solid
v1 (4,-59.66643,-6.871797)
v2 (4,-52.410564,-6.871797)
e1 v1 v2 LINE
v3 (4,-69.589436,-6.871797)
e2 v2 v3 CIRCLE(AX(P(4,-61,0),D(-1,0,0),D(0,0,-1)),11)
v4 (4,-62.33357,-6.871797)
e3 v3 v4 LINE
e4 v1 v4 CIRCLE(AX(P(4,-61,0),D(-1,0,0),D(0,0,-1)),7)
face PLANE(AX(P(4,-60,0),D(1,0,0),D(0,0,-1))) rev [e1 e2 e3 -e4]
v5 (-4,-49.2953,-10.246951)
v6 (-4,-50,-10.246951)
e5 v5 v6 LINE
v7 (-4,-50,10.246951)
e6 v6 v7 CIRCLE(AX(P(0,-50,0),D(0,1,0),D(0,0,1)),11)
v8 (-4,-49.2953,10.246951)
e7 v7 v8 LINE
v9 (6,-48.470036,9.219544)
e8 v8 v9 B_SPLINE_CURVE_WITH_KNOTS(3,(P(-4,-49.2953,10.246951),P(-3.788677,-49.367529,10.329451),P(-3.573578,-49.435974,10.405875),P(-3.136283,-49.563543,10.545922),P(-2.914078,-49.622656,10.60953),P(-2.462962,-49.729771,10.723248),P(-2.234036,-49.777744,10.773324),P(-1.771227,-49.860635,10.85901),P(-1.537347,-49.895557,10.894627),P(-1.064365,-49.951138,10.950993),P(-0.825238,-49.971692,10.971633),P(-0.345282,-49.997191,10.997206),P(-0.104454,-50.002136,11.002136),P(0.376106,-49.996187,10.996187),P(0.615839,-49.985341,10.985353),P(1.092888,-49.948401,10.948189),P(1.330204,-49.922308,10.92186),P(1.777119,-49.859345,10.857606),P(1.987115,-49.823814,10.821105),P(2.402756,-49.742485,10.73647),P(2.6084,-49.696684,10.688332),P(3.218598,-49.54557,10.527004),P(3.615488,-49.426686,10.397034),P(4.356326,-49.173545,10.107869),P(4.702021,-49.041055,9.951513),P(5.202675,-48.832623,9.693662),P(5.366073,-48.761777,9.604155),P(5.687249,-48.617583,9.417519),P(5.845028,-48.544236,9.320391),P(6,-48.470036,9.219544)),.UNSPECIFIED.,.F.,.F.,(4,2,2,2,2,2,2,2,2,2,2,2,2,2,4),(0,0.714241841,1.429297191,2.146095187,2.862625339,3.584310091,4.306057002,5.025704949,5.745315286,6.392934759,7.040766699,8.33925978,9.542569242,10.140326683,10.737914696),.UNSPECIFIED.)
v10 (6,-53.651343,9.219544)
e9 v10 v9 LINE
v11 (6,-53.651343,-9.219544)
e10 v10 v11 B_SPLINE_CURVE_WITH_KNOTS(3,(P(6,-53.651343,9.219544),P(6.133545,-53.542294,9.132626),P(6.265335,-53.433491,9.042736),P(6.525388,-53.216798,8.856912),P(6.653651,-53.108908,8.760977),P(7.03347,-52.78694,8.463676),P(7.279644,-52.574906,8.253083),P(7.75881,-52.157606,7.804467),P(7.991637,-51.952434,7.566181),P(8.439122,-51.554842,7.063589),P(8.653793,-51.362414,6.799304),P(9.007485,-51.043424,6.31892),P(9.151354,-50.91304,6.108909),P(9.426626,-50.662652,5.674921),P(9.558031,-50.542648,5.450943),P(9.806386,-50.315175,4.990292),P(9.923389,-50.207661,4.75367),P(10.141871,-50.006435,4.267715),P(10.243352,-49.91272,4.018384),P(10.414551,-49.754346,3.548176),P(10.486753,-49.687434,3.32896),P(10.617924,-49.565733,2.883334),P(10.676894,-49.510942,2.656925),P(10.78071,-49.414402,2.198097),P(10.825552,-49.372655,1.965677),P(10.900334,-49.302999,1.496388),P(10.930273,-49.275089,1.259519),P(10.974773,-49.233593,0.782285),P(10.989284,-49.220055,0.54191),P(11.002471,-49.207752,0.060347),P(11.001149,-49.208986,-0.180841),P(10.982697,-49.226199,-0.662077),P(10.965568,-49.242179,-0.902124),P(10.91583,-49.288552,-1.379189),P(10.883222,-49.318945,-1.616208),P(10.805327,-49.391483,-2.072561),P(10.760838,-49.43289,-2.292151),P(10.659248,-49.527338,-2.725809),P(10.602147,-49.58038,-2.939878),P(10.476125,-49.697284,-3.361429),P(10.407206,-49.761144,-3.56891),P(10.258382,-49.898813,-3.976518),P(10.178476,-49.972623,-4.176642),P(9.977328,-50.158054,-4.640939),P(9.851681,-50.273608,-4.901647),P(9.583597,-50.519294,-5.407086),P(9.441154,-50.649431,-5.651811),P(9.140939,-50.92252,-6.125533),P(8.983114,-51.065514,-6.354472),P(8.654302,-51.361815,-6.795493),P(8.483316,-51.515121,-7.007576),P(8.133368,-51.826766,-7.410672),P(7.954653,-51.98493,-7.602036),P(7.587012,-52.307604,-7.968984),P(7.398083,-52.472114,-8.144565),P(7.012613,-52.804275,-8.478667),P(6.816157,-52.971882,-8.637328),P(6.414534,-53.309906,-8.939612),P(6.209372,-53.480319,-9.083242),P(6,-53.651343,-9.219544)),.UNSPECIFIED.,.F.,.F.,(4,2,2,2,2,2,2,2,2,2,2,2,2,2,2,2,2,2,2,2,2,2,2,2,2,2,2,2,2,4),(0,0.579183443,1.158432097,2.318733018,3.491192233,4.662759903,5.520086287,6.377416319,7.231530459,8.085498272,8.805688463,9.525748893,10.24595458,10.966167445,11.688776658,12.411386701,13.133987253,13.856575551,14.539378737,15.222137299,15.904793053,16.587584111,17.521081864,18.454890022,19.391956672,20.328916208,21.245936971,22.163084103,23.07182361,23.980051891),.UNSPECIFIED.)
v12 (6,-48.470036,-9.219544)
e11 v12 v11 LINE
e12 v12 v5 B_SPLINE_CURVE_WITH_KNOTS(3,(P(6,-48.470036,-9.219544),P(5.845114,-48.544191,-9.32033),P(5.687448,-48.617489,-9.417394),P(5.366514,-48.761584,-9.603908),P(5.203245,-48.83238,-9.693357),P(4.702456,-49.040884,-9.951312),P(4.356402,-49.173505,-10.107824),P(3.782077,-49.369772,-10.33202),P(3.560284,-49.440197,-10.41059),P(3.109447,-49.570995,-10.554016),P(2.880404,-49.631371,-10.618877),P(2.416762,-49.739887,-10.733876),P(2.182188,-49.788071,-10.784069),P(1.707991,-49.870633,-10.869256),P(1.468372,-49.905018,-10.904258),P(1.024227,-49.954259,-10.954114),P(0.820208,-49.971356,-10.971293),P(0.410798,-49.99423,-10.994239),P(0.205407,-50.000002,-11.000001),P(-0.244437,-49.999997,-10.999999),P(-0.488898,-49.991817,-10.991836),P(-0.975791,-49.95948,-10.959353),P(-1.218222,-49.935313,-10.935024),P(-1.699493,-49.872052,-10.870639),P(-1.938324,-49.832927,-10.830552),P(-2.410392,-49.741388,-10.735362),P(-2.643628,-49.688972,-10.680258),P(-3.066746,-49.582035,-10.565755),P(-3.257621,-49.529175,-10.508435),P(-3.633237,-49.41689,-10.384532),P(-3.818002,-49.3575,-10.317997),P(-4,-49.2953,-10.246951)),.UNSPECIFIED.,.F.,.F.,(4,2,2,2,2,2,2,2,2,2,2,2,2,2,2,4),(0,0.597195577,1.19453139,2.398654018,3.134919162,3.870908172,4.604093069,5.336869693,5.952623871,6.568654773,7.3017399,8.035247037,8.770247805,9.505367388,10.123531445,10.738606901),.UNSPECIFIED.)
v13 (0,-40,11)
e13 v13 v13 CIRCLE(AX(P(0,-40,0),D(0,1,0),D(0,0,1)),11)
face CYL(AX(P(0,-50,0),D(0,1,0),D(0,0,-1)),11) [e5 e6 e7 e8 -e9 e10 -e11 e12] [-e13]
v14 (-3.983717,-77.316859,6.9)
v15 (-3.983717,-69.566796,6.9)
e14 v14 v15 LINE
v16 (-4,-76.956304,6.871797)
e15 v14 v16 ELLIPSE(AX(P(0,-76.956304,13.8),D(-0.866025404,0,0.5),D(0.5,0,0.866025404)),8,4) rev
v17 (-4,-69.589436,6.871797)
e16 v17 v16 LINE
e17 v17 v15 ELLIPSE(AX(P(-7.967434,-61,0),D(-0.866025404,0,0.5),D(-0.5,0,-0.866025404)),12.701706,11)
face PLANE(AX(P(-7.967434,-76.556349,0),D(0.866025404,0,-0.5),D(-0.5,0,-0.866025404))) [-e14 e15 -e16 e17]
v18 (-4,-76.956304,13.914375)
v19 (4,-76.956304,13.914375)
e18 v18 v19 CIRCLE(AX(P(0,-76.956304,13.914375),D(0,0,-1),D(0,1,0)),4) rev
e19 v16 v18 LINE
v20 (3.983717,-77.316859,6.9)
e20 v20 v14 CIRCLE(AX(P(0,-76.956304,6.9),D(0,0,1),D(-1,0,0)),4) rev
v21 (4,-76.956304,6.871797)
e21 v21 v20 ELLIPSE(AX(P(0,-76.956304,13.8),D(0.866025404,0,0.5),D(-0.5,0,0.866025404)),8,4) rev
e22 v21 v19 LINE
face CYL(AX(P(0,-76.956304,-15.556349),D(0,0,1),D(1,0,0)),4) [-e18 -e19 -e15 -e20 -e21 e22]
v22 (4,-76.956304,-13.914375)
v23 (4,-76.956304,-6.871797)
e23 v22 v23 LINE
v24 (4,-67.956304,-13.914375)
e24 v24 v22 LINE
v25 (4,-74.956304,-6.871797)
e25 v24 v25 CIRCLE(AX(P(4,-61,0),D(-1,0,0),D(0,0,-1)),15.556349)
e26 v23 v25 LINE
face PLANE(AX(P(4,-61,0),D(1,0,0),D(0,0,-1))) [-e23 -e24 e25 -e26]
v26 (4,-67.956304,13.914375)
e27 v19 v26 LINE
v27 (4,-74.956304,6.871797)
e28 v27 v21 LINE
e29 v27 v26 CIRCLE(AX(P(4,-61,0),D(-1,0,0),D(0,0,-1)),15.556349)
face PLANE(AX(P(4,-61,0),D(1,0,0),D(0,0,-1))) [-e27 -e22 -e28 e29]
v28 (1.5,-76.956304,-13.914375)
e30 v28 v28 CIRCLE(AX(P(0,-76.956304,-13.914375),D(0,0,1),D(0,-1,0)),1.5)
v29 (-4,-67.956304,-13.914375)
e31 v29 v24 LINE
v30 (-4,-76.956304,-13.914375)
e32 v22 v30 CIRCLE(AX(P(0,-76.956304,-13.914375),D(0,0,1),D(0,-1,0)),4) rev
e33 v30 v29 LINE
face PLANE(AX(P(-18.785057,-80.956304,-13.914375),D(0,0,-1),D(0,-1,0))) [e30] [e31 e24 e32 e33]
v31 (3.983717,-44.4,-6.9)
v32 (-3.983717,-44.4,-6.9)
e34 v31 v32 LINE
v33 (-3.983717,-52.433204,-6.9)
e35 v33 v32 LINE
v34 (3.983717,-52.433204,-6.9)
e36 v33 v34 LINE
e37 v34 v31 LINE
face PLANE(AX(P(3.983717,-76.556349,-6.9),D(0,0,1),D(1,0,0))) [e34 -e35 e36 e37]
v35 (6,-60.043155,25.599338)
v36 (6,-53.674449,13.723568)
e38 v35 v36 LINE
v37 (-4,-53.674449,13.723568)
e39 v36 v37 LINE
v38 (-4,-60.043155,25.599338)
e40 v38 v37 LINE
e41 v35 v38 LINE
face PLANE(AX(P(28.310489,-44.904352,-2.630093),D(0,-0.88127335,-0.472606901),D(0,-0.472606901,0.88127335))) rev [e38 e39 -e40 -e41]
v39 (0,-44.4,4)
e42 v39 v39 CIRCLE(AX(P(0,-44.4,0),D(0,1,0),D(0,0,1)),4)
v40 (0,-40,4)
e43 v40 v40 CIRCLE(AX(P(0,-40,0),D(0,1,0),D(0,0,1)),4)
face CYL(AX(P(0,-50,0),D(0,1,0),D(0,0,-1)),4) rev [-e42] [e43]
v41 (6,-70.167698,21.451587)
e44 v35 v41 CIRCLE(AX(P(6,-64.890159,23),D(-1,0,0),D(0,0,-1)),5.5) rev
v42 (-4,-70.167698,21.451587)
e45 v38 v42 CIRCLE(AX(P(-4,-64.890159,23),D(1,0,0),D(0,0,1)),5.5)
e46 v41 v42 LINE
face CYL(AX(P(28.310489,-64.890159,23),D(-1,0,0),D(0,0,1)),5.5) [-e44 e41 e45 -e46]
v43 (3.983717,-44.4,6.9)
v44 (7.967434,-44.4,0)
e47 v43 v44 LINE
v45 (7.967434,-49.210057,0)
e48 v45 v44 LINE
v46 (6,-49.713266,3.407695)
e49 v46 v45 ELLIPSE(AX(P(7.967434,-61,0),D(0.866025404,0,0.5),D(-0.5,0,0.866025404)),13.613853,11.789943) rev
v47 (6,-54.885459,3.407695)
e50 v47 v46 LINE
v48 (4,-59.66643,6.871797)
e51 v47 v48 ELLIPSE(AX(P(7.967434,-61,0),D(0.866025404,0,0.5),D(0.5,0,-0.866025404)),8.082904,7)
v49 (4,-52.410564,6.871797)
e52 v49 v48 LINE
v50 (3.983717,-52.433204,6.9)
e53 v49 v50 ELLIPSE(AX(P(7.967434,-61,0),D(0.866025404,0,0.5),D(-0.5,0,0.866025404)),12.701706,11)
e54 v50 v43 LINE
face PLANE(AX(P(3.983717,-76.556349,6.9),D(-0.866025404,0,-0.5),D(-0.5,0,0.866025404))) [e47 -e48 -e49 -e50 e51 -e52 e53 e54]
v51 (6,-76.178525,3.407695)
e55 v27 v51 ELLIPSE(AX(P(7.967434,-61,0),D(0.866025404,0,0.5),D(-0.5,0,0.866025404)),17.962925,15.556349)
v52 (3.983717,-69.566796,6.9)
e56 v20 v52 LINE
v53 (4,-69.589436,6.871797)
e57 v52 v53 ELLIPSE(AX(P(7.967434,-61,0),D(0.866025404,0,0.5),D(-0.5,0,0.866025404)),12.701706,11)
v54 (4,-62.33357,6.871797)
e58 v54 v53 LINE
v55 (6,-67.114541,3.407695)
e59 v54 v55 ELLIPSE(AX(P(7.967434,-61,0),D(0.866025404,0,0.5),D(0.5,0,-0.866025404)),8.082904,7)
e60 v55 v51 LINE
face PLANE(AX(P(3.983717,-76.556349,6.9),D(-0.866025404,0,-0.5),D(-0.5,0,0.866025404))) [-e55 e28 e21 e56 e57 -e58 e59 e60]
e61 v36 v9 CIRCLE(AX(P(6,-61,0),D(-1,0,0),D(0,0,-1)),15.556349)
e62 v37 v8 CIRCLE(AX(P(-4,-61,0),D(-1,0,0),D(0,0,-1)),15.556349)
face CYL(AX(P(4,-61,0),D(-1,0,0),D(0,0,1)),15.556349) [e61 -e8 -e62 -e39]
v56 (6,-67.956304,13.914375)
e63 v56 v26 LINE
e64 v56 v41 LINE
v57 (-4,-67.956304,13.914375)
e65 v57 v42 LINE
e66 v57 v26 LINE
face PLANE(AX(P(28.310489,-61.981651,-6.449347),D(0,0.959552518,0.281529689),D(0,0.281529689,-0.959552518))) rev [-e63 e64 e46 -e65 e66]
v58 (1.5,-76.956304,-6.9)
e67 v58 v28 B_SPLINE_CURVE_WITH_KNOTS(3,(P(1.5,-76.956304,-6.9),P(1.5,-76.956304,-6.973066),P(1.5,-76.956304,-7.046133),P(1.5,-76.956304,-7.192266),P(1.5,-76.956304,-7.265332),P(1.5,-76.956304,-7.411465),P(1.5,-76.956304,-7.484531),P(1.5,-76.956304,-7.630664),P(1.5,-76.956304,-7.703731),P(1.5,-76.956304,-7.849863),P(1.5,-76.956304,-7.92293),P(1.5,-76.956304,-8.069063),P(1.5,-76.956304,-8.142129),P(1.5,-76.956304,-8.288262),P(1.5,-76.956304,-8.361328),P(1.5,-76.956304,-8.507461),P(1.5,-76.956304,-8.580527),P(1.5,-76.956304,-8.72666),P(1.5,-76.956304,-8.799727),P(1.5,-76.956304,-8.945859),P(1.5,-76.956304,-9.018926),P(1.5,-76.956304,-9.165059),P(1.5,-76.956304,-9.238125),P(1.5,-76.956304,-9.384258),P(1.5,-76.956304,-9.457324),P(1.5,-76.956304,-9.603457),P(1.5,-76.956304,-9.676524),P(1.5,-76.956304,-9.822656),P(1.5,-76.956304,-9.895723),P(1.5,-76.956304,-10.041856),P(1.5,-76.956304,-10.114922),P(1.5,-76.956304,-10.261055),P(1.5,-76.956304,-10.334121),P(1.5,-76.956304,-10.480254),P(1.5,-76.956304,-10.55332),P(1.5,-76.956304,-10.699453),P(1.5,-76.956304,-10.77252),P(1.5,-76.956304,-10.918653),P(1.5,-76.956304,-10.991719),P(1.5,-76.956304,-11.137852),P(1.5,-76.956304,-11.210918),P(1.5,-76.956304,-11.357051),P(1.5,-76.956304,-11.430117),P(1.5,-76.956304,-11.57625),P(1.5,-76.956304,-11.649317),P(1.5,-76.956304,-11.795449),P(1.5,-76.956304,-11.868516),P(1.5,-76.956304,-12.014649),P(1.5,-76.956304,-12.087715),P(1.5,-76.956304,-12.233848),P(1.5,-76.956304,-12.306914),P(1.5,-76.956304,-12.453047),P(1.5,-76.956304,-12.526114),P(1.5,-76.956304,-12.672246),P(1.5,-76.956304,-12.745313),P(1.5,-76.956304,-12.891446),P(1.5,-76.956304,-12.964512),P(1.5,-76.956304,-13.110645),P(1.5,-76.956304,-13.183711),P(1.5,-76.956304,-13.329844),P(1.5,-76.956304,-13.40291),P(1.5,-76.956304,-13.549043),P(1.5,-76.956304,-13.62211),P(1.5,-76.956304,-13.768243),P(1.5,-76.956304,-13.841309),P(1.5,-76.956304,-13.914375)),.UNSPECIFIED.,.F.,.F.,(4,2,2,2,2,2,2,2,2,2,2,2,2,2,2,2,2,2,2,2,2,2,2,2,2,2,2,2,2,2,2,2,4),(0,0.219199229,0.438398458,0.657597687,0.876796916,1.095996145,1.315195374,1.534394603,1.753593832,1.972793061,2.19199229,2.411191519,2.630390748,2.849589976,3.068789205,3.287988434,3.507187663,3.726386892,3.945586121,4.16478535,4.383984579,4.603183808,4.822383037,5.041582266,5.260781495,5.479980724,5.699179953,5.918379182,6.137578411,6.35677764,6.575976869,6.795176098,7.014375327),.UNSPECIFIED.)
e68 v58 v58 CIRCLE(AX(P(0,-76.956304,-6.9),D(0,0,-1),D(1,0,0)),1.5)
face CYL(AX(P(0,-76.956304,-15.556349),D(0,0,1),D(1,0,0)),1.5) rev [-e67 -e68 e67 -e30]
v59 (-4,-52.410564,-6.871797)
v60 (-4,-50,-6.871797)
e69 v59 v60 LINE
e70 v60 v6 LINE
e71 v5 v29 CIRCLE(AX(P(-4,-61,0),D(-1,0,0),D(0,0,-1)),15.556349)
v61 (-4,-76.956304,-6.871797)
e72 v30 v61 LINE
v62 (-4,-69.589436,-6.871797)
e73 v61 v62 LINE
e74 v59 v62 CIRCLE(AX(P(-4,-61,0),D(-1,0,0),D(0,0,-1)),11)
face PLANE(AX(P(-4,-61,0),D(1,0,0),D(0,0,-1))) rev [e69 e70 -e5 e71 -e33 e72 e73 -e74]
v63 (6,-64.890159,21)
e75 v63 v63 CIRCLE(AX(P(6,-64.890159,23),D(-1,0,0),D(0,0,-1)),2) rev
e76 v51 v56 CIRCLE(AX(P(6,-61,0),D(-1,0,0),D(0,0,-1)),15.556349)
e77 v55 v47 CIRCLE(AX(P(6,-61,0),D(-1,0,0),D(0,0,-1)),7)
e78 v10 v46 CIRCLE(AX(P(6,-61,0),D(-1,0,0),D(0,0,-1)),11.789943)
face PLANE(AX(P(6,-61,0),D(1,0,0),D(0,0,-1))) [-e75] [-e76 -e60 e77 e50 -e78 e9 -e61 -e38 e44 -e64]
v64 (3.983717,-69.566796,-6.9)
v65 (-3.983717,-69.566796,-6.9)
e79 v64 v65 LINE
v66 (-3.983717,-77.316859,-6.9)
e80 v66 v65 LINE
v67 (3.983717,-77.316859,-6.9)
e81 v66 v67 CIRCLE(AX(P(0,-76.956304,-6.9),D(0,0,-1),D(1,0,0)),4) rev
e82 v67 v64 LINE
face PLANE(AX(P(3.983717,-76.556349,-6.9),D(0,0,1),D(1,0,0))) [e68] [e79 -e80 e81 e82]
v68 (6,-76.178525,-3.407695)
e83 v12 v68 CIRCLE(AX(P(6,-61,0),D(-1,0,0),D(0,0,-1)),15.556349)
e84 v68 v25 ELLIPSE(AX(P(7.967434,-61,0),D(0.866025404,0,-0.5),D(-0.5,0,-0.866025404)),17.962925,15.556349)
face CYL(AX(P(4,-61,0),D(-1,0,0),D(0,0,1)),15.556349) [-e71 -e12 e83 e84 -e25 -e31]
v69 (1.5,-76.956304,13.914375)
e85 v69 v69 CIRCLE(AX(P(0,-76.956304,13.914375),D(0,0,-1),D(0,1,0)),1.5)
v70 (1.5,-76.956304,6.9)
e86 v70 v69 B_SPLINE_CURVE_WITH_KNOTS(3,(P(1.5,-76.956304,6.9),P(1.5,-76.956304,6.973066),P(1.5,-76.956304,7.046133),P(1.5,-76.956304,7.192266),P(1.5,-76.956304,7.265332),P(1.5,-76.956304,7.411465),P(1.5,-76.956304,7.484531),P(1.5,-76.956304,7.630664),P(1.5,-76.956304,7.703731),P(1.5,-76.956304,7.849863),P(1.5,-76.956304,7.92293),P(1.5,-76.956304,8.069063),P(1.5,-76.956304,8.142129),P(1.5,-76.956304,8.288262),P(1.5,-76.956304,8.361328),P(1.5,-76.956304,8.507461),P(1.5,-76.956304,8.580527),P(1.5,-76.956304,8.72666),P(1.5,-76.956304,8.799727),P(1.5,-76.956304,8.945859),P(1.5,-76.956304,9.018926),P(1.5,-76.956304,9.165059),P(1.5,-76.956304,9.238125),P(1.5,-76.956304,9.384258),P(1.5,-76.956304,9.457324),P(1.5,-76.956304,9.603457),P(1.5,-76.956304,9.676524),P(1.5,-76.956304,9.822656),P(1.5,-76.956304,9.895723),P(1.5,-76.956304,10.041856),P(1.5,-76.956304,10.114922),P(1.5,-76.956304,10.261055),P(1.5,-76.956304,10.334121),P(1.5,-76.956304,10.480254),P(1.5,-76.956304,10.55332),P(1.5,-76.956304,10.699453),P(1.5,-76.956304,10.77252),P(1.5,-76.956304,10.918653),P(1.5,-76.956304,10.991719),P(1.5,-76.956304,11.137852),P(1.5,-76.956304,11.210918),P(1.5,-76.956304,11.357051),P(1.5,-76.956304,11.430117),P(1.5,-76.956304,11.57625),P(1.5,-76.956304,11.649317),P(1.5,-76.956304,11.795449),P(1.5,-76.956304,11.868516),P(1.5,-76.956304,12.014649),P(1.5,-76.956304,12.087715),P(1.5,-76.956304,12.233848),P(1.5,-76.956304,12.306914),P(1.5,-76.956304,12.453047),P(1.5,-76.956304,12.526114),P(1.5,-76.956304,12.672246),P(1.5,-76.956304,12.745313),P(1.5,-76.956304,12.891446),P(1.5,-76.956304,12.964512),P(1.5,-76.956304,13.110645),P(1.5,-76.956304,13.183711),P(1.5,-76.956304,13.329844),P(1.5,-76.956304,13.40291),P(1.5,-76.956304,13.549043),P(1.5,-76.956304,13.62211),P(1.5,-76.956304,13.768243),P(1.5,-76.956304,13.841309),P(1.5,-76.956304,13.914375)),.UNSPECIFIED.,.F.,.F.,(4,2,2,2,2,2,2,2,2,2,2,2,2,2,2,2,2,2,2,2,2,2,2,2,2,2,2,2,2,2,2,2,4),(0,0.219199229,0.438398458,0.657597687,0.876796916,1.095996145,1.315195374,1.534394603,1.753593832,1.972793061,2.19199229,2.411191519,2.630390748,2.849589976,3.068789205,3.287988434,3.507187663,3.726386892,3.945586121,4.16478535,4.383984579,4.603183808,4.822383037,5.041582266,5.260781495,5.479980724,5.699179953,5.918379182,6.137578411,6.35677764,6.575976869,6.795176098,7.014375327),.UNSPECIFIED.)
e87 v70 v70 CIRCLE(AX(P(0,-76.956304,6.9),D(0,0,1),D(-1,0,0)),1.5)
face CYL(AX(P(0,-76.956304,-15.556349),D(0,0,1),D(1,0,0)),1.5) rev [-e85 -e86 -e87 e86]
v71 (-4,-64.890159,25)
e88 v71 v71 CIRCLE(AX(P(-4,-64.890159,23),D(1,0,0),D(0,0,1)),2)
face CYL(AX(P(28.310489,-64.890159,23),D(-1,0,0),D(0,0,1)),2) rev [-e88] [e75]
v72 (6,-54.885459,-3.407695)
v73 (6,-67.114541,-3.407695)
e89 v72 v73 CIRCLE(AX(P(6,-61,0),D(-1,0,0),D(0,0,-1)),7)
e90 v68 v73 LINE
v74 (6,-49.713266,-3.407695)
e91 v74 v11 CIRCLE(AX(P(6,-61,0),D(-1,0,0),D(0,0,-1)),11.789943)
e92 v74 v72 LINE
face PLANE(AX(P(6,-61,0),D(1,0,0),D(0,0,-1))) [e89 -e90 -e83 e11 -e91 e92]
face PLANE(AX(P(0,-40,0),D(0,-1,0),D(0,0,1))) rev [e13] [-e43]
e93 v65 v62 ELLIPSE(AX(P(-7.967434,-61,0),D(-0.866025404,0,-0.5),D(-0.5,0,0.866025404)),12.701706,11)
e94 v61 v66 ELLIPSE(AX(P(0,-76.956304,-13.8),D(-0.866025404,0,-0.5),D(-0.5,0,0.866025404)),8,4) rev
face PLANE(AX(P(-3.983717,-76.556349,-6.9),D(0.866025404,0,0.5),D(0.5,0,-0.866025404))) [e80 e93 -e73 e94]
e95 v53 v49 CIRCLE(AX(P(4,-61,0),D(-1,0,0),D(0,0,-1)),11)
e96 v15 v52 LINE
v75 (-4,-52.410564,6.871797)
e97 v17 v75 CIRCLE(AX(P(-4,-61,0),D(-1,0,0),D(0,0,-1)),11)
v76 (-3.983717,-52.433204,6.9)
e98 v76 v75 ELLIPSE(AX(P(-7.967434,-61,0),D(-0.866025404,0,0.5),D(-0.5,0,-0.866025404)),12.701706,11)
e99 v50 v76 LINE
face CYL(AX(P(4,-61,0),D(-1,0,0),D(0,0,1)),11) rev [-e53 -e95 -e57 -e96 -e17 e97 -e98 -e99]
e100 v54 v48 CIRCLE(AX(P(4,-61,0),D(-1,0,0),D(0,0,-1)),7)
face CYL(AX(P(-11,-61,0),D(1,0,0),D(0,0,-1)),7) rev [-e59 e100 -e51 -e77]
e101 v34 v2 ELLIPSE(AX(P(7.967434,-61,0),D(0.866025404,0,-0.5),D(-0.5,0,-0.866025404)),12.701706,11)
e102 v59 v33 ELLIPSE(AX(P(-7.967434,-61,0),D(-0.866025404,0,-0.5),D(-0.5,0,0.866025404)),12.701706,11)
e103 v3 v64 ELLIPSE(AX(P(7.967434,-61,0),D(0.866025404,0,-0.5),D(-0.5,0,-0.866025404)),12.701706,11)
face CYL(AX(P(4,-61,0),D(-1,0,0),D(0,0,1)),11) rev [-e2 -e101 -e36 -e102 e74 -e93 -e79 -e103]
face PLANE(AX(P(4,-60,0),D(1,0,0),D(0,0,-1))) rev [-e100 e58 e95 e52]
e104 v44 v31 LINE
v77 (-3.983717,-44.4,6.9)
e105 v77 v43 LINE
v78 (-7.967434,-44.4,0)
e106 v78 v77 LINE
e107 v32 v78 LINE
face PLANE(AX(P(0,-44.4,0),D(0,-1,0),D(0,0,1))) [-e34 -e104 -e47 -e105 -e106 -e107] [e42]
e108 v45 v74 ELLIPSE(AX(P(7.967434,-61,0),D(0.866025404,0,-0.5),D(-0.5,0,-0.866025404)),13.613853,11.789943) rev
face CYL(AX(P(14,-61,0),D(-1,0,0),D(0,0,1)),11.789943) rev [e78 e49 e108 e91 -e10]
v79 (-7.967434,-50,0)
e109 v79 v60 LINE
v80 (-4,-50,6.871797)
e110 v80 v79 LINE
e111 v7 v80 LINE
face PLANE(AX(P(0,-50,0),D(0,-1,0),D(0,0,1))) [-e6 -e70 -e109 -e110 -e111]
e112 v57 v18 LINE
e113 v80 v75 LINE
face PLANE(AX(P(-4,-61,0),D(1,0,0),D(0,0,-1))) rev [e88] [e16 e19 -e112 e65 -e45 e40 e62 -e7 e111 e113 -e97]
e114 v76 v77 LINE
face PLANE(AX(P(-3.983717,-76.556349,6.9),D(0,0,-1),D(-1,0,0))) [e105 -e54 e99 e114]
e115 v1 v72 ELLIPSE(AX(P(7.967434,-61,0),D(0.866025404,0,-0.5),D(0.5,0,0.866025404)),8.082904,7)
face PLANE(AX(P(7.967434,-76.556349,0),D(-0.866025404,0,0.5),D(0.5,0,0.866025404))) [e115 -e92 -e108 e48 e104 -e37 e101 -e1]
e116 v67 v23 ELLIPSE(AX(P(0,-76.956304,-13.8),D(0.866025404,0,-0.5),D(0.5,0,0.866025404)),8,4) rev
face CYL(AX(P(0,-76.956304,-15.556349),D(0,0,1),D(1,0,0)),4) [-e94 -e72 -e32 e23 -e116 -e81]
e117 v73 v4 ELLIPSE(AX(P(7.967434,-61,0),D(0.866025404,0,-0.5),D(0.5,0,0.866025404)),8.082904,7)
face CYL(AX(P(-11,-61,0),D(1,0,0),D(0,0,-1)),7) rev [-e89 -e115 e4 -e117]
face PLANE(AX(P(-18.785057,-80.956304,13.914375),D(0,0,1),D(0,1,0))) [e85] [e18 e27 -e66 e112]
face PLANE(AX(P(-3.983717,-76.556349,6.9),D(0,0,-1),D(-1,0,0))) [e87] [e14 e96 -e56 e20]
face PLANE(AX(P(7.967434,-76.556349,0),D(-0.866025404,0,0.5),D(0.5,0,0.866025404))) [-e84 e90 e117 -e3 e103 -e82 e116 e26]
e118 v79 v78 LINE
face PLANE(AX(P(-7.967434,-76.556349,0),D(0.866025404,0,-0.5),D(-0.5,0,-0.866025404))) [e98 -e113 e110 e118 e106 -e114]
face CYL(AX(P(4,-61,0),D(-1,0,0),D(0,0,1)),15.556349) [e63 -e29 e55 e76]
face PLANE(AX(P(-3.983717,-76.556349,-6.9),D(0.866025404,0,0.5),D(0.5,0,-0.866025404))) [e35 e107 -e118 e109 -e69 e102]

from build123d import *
from build123d.topology import SkipClean

# Parameters (mm, degrees)
SKETCH1_R               = 11
SKETCH1_R_2             = 4
BOSS_EXTRUDE1_DEPTH     = 10
SKETCH3_R               = 15.556349186
SKETCH3_R_2             = 11
BOSS_EXTRUDE2_DEPTH     = 4
CUT_EXTRUDE1_DEPTH      = 33.68393631
CUT_EXTRUDE1_DEPTH_BACK = 5.6
BOSS_EXTRUDE4_DEPTH     = 10
BOSS_EXTRUDE3_DEPTH     = 8
BOSS_EXTRUDE5_START     = 4
SKETCH3_2_R             = 15.556349186
SKETCH3_2_R_2           = 11
BOSS_EXTRUDE5_DEPTH     = 2
CUT_EXTRUDE2_DEPTH      = 37.349590584
CUT_EXTRUDE2_DEPTH_BACK = 5.6
CUT_EXTRUDE3_DEPTH      = 47.993816701
CUT_EXTRUDE3_DEPTH_BACK = 47.993816701
SKETCH13_R              = 7
CUT_EXTRUDE5_DEPTH      = 52.642447787
CUT_EXTRUDE5_DEPTH_BACK = 52.642447787
SKETCH14_R              = 1.5
SKETCH15_R              = 11.789942891
CUT_EXTRUDE6_DEPTH      = 8
BOSS_EXTRUDE6_REACH     = 48.308
SKETCH16_R              = 2


with BuildPart() as part:
    # Sketch1 → Boss-Extrude1 (new body)
    with BuildSketch(Plane(origin=(0, 0, 0), x_dir=(1, 0, 0), z_dir=(0, 1, 0))):
        with Locations(Location((0, 0, 0), (0, 0, 270))):
            Circle(SKETCH1_R)
        with Locations(Location((0, 0, 0), (0, 0, 270))):
            Circle(SKETCH1_R_2, mode=Mode.SUBTRACT)
    extrude(amount=BOSS_EXTRUDE1_DEPTH)

    # Sketch3 → Boss-Extrude2 (add, symmetric)
    with BuildSketch(Plane(origin=(0, 0, 0), x_dir=(0, 0, -1), z_dir=(1, 0, 0))):
        with Locations((0, 21)):
            Circle(SKETCH3_R)
        with Locations(Location((0, 21, 0), (0, 0, 270))):
            Circle(SKETCH3_R_2, mode=Mode.SUBTRACT)
    extrude(amount=BOSS_EXTRUDE2_DEPTH, both=True)

    # Sketch2 → Cut-Extrude1 (cut, two sides: drawn at the far end of the back side and taken through both)
    with BuildSketch(Plane(origin=(0, 10, 0), x_dir=(1, 0, 0), z_dir=(0, 1, 0)).offset(-CUT_EXTRUDE1_DEPTH_BACK)):
        Polygon((3.983716857, 6.9), (-3.983716857, 6.9), (-7.967433715, 0), (-3.983716857, -6.9), (3.983716857, -6.9), (7.967433715, 0), align=None)
    extrude(amount=CUT_EXTRUDE1_DEPTH + CUT_EXTRUDE1_DEPTH_BACK, mode=Mode.SUBTRACT)

    # Sketch9 → Boss-Extrude4 (add)
    with BuildSketch(Plane(origin=(0, 10, 0), x_dir=(1, 0, 0), z_dir=(0, 1, 0))):
        with BuildLine():
            ThreePointArc((4, -10.246950766), (11, 0), (4, 10.246950766))
            Line((4, 10.246950766), (4, 6.87179677))
            Line((4, 6.87179677), (7.967433715, 0))
            Line((7.967433715, 0), (4, -6.87179677))
            Line((4, -6.87179677), (4, -10.246950766))
        make_face()
    extrude(amount=BOSS_EXTRUDE4_DEPTH)

    # Sketch4 → Boss-Extrude3 (add)
    with BuildSketch(Plane(origin=(4, 0, 0), x_dir=(0, 0, -1), z_dir=(1, 0, 0))):
        with BuildLine():
            Line((-6.87179677, 34.956303563), (-6.87179677, 40.956303563))
            Line((-6.87179677, 40.956303563), (-13.914375327, 40.956303563))
            Line((-13.914375327, 40.956303563), (-13.914375327, 27.956303563))
            ThreePointArc((-13.914375327, 27.956303563), (-10.966596446, 32.033302425), (-6.87179677, 34.956303563))
        make_face()
        with BuildLine():
            Line((6.87179677, 34.956303563), (6.87179677, 40.956303563))
            Line((6.87179677, 40.956303563), (13.914375327, 40.956303563))
            Line((13.914375327, 40.956303563), (13.914375327, 27.956303563))
            ThreePointArc((13.914375327, 27.956303563), (10.966596446, 32.033302425), (6.87179677, 34.956303563))
        make_face()
    extrude(amount=-BOSS_EXTRUDE3_DEPTH)

    # Sketch3<2> → Boss-Extrude5 (add)
    # profile 1 of 2: a face of its own
    with SkipClean():  # the faces are left unmerged after this step: merging them gives an invalid solid
        with BuildSketch(Plane(origin=(0, 0, 0), x_dir=(0, 0, -1), z_dir=(1, 0, 0)).offset(BOSS_EXTRUDE5_START)):
            with Locations((0, 21)):
                Circle(SKETCH3_2_R)
            with Locations((0, 21)):
                Circle(SKETCH3_2_R_2, mode=Mode.SUBTRACT)
        # profile 2 of 2: a face of its own
        with BuildSketch(Plane(origin=(0, 0, 0), x_dir=(0, 0, -1), z_dir=(1, 0, 0)).offset(BOSS_EXTRUDE5_START)):
            with Locations((0, 21)):
                Circle(SKETCH3_2_R_2)
        extrude(amount=BOSS_EXTRUDE5_DEPTH)
    add(part.part.scale(1), mode=Mode.REPLACE)  # the faces are merged on a copy

    # Sketch2<2> → Cut-Extrude2 (cut, two sides: drawn at the far end of the back side and taken through both)
    with BuildSketch(Plane(origin=(0, 10, 0), x_dir=(1, 0, 0), z_dir=(0, 1, 0)).offset(-CUT_EXTRUDE2_DEPTH_BACK)):
        Polygon((3.983716857, 6.9), (-3.983716857, 6.9), (-7.967433715, 0), (-3.983716857, -6.9), (3.983716857, -6.9), (7.967433715, 0), align=None)
    extrude(amount=CUT_EXTRUDE2_DEPTH + CUT_EXTRUDE2_DEPTH_BACK, mode=Mode.SUBTRACT)

    # Sketch13 → Cut-Extrude3 (cut, two sides: drawn at the far end of the back side and taken through both)
    with BuildSketch(Plane(origin=(6, 0, 0), x_dir=(0, 0, -1), z_dir=(1, 0, 0)).offset(-CUT_EXTRUDE3_DEPTH_BACK)):
        with Locations((0, 21)):
            Circle(SKETCH13_R)
    extrude(amount=CUT_EXTRUDE3_DEPTH + CUT_EXTRUDE3_DEPTH_BACK, mode=Mode.SUBTRACT)

    # Sketch14 → Cut-Extrude5 (cut, two sides: drawn at the far end of the back side and taken through both)
    with BuildSketch(Plane.XY.offset(13.914375327).offset(-CUT_EXTRUDE5_DEPTH_BACK)):
        with Locations((0, 36.956303563)):
            Circle(SKETCH14_R)
        with BuildLine():
            Line((-4, 36.956303563), (-4, 43.473651887))
            Line((-4, 43.473651887), (4, 43.473651887))
            Line((4, 43.473651887), (4, 36.956303563))
            ThreePointArc((4, 36.956303563), (0, 40.956303563), (-4, 36.956303563))
        make_face()
    extrude(amount=CUT_EXTRUDE5_DEPTH + CUT_EXTRUDE5_DEPTH_BACK, mode=Mode.SUBTRACT)

    # Sketch15 → Cut-Extrude6 (cut)
    with BuildSketch(Plane(origin=(6, 0, 0), x_dir=(0, 0, -1), z_dir=(1, 0, 0))):
        with Locations((0, 21)):
            Circle(SKETCH15_R)
    extrude(amount=CUT_EXTRUDE6_DEPTH, mode=Mode.SUBTRACT)

    # Boss-Extrude6: up to this face of the body (flat: up to its plane)
    boss_extrude6_end = Plane(part.part.faces().sort_by_distance((6, 22.369931635, 9.227258585))[0])
    # Sketch16 → Boss-Extrude6 (add, up to the picked face)
    with BuildSketch(Plane.ZY.offset(4), mode=Mode.PRIVATE) as boss_extrude6_sk1:
        with BuildLine():
            Line((13.723567505, 13.674449171), (25.599337953, 20.043155389))
            ThreePointArc((25.599337953, 20.043155389), (28.089469493, 26.975176866), (21.451586712, 30.167697662))
            Line((21.451586712, 30.167697662), (13.914375327, 27.956303563))
            ThreePointArc((13.914375327, 27.956303563), (15.554961016, 20.792183273), (13.723567505, 13.674449171))
        make_face()
        with Locations((23, 24.890158814)):
            Circle(SKETCH16_R, mode=Mode.SUBTRACT)
    boss_extrude6_tool1 = split(extrude(boss_extrude6_sk1.sketch, amount=-BOSS_EXTRUDE6_REACH, mode=Mode.PRIVATE), bisect_by=boss_extrude6_end, keep=Keep.BOTH, mode=Mode.PRIVATE)
    add(boss_extrude6_tool1.solids().sort_by(Axis((-4, 23.412763, 20.74002), (1, 0, 0)))[0])


with BuildPart() as body_2:
    # Mirror1: mirrored copy
    add(part.part.mirror(Plane(origin=(0, -20, 0), x_dir=(0, 0, 1), z_dir=(0, -1, 0))))


solid = body_2.part
